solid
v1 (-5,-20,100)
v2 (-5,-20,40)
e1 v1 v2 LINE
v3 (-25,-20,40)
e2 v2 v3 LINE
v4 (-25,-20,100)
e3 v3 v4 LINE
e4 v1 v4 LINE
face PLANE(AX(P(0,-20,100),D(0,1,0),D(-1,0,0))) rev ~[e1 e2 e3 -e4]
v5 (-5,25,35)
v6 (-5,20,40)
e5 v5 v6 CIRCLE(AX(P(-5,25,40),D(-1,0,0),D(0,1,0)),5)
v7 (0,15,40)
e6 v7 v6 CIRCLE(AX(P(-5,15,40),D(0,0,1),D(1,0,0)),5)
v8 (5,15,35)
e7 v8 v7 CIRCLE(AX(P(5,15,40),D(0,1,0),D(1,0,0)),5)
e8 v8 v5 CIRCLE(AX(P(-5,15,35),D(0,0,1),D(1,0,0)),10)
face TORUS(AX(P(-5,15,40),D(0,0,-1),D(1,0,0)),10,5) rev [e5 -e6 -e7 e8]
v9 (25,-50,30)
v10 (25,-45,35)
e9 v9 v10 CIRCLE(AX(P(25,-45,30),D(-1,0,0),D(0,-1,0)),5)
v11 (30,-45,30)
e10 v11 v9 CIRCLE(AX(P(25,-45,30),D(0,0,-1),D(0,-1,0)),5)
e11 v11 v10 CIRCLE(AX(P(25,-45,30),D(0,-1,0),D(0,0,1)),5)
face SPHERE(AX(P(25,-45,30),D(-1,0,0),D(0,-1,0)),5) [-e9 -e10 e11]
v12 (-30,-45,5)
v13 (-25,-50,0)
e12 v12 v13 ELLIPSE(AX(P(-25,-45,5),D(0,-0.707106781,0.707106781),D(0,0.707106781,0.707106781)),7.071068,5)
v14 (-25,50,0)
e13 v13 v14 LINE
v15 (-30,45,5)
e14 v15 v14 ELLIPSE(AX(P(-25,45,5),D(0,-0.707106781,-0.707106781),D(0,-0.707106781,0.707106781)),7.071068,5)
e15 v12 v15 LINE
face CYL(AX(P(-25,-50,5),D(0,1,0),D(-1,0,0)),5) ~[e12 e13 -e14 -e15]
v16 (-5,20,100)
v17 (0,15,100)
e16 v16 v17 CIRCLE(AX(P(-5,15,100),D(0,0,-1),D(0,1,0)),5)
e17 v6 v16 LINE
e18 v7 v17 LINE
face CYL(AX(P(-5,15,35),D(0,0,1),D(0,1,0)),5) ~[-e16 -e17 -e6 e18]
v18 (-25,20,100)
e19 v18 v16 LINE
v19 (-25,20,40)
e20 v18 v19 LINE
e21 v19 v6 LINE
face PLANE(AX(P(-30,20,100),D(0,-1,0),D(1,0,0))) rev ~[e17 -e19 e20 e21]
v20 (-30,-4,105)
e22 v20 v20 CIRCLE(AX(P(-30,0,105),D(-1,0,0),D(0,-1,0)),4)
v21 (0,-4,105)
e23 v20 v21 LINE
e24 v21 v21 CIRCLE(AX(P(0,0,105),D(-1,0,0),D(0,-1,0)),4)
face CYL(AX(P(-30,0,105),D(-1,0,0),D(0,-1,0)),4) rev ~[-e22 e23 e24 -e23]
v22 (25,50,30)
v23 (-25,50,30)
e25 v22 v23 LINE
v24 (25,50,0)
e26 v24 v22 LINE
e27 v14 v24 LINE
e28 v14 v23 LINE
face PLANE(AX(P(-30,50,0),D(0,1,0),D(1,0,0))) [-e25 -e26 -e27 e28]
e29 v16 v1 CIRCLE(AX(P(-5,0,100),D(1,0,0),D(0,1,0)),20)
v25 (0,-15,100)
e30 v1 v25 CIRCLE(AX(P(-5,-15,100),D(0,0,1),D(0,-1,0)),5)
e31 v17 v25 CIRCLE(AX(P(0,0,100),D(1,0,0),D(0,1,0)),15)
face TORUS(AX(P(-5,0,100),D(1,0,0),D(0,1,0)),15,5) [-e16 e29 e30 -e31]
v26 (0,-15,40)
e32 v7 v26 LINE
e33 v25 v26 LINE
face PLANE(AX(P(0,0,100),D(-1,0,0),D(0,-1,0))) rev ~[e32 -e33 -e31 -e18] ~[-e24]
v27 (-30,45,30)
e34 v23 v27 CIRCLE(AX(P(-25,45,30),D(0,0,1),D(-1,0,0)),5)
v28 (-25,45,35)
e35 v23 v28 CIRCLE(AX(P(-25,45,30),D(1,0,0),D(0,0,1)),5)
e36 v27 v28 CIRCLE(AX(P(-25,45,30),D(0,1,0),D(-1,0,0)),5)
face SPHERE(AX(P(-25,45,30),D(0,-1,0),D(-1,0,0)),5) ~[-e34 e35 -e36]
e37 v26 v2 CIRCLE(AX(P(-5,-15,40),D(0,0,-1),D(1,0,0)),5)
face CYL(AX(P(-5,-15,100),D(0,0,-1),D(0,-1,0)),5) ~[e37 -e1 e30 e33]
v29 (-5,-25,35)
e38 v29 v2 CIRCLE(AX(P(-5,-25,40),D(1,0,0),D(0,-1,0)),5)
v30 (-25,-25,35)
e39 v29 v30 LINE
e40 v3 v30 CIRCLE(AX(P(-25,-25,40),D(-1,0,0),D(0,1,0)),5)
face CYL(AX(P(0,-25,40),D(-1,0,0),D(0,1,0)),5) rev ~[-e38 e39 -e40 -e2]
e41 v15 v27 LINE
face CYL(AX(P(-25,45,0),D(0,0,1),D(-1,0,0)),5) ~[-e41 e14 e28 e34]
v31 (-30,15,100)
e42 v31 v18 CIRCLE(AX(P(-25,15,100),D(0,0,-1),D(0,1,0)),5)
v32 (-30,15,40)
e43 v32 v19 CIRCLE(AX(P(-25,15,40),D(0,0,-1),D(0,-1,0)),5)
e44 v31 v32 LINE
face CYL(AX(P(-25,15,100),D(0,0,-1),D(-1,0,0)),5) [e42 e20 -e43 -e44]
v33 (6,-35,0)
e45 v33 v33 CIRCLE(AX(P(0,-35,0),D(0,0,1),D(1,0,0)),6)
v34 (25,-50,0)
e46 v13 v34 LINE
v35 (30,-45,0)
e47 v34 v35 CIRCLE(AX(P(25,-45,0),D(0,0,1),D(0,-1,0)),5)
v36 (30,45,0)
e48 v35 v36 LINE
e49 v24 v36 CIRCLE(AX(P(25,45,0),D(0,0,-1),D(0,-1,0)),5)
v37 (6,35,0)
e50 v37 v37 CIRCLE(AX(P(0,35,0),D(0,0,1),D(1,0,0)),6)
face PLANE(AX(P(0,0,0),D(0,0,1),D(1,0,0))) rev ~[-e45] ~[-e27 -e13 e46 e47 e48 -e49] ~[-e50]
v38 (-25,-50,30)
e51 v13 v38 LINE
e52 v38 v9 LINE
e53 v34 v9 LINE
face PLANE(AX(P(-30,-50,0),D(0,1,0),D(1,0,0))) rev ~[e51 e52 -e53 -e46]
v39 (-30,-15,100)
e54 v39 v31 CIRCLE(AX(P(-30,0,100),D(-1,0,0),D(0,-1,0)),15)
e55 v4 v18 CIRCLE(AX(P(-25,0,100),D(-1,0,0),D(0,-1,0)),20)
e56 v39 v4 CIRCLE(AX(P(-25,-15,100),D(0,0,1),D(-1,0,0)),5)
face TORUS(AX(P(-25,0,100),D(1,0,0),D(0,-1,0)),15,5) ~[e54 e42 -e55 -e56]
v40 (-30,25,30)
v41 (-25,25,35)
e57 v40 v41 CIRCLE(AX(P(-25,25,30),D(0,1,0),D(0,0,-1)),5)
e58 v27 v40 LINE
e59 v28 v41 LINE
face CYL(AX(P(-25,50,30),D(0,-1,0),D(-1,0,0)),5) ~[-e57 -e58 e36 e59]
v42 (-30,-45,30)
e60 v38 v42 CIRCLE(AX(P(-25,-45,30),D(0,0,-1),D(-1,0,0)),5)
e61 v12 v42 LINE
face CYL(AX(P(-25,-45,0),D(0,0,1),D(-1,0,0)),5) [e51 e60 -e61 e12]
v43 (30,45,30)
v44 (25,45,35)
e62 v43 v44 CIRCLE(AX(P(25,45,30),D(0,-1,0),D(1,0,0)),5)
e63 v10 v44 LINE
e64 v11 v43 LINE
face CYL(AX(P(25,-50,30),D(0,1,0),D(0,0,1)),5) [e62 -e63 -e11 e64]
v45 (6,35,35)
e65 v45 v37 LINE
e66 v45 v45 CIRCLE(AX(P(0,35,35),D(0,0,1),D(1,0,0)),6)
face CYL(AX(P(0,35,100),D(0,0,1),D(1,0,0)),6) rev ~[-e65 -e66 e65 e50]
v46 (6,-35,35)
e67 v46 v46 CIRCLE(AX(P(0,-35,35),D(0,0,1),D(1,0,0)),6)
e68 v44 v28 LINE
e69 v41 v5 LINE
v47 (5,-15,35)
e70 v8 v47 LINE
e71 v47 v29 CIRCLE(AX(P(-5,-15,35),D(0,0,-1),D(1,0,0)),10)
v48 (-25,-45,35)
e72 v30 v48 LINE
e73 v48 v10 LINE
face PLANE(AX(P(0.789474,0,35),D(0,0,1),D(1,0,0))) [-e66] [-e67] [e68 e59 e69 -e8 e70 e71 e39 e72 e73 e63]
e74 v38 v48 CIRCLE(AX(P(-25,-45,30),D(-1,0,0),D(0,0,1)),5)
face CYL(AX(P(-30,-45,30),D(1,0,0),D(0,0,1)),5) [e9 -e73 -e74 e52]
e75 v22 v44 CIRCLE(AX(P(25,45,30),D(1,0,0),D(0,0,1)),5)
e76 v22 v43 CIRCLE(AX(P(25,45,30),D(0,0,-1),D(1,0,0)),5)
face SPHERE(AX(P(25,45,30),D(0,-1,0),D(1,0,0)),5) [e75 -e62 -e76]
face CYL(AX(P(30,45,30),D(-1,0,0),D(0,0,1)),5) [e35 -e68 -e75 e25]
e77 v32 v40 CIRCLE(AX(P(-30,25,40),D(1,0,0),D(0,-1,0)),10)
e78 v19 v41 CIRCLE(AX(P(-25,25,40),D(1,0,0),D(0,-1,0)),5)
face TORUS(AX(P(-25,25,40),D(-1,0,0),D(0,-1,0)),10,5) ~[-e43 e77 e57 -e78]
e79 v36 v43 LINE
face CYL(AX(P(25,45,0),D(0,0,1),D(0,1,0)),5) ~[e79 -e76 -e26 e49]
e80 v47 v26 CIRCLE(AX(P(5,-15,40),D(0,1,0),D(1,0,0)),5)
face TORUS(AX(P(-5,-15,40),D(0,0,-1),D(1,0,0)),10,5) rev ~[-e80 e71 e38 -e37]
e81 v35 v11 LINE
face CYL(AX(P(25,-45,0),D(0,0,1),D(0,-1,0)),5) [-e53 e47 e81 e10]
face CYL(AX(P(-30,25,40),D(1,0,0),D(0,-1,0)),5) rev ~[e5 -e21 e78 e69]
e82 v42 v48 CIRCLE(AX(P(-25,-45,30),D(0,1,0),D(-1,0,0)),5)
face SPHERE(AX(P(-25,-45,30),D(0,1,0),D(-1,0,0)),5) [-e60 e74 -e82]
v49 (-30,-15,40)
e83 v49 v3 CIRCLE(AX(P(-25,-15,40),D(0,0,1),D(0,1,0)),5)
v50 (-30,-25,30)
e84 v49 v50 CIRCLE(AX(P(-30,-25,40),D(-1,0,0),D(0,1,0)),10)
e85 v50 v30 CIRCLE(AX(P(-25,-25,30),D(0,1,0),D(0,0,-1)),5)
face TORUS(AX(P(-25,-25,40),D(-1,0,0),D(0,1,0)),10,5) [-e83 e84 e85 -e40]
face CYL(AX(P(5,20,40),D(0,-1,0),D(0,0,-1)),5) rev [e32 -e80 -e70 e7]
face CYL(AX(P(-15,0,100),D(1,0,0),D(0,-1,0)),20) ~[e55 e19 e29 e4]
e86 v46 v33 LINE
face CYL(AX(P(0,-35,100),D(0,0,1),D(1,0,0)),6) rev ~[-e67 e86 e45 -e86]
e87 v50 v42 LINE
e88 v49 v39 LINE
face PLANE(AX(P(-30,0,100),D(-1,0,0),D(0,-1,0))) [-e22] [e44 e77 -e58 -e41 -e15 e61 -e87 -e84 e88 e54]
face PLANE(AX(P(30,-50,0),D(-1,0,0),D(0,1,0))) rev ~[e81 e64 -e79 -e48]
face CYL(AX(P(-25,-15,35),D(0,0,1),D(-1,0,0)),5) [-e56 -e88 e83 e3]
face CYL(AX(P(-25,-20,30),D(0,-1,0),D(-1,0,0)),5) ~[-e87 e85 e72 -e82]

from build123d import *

# Parameters (mm, degrees)
F0_W     = 60
F0_H     = 100
F1_DEPTH = 100
F2_R     = 6
F3_DEPTH = 100
F4_R     = 6
F5_DEPTH = 65
F6_W     = 30
F6_H     = 20
F7_ANGLE = 180
F8_R     = 4
F9_DEPTH = 50
F10_R    = 5


with BuildPart() as f1:
    # F0 (on Top) → F1 (new body)
    with BuildSketch(Plane.XY):
        Rectangle(F0_W, F0_H)
    extrude(amount=F1_DEPTH)

    # F2 (on face) → F3 (cut)
    with BuildSketch(Plane.XY.offset(100)):
        with Locations((0, 35)):
            Circle(F2_R)
        with Locations((0, -35)):
            Circle(F2_R)
    extrude(amount=-F3_DEPTH, mode=Mode.SUBTRACT)

    # F4 (on face) → F5 (cut)
    with BuildSketch(Plane.XY.offset(100)):
        Polygon((0, 20), (0, 0), (0, -20), (-30, -20), (-30, -50), (30, -50), (30, 50), (-30, 50), (-30, 20), align=None)
        with Locations((0, -35)):
            Circle(F4_R, mode=Mode.SUBTRACT)
        with Locations((0, 35)):
            Circle(F4_R, mode=Mode.SUBTRACT)
    extrude(amount=-F5_DEPTH, mode=Mode.SUBTRACT)

    # F6 (on face) → F7 (revolve)
    with BuildSketch(Plane.XY.offset(100)):
        with Locations((-15, -10)):
            Rectangle(F6_W, F6_H)
    revolve(axis=Axis((-15, 0, 100), (-1, 0, 0)), revolution_arc=F7_ANGLE)

    # F8 (on face) → F9 (cut)
    with BuildSketch(Plane(origin=(-30, 0, 0), x_dir=(0, -1, 0), z_dir=(-1, 0, 0))):
        with Locations((0, 105)):
            Circle(F8_R)
    extrude(amount=-F9_DEPTH, mode=Mode.SUBTRACT)

    # F10
    f10_edges = [f1.edges().sort_by_distance(p)[0] for p in [
        (-30, 20, 67.5),
        (-30, 35, 35),
        (-30, 50, 17.5),
        (-30, 0, 0),
        (-30, -35, 35),
        (-30, -50, 17.5),
        (0, -50, 35),
        (30, -50, 17.5),
        (30, 0, 35),
        (-15, -20, 35),
        (0, -20, 67.5),
        (30, 50, 17.5),
        (0, 50, 35),
        (0, 0, 35),
        (-15, 20, 35),
        (-30, -20, 67.5),
        (-30, 0, 120),
        (0, 20, 67.5),
        (0, 0, 120),
    ]]
    fillet(f10_edges, radius=F10_R)


solid = f1.part
